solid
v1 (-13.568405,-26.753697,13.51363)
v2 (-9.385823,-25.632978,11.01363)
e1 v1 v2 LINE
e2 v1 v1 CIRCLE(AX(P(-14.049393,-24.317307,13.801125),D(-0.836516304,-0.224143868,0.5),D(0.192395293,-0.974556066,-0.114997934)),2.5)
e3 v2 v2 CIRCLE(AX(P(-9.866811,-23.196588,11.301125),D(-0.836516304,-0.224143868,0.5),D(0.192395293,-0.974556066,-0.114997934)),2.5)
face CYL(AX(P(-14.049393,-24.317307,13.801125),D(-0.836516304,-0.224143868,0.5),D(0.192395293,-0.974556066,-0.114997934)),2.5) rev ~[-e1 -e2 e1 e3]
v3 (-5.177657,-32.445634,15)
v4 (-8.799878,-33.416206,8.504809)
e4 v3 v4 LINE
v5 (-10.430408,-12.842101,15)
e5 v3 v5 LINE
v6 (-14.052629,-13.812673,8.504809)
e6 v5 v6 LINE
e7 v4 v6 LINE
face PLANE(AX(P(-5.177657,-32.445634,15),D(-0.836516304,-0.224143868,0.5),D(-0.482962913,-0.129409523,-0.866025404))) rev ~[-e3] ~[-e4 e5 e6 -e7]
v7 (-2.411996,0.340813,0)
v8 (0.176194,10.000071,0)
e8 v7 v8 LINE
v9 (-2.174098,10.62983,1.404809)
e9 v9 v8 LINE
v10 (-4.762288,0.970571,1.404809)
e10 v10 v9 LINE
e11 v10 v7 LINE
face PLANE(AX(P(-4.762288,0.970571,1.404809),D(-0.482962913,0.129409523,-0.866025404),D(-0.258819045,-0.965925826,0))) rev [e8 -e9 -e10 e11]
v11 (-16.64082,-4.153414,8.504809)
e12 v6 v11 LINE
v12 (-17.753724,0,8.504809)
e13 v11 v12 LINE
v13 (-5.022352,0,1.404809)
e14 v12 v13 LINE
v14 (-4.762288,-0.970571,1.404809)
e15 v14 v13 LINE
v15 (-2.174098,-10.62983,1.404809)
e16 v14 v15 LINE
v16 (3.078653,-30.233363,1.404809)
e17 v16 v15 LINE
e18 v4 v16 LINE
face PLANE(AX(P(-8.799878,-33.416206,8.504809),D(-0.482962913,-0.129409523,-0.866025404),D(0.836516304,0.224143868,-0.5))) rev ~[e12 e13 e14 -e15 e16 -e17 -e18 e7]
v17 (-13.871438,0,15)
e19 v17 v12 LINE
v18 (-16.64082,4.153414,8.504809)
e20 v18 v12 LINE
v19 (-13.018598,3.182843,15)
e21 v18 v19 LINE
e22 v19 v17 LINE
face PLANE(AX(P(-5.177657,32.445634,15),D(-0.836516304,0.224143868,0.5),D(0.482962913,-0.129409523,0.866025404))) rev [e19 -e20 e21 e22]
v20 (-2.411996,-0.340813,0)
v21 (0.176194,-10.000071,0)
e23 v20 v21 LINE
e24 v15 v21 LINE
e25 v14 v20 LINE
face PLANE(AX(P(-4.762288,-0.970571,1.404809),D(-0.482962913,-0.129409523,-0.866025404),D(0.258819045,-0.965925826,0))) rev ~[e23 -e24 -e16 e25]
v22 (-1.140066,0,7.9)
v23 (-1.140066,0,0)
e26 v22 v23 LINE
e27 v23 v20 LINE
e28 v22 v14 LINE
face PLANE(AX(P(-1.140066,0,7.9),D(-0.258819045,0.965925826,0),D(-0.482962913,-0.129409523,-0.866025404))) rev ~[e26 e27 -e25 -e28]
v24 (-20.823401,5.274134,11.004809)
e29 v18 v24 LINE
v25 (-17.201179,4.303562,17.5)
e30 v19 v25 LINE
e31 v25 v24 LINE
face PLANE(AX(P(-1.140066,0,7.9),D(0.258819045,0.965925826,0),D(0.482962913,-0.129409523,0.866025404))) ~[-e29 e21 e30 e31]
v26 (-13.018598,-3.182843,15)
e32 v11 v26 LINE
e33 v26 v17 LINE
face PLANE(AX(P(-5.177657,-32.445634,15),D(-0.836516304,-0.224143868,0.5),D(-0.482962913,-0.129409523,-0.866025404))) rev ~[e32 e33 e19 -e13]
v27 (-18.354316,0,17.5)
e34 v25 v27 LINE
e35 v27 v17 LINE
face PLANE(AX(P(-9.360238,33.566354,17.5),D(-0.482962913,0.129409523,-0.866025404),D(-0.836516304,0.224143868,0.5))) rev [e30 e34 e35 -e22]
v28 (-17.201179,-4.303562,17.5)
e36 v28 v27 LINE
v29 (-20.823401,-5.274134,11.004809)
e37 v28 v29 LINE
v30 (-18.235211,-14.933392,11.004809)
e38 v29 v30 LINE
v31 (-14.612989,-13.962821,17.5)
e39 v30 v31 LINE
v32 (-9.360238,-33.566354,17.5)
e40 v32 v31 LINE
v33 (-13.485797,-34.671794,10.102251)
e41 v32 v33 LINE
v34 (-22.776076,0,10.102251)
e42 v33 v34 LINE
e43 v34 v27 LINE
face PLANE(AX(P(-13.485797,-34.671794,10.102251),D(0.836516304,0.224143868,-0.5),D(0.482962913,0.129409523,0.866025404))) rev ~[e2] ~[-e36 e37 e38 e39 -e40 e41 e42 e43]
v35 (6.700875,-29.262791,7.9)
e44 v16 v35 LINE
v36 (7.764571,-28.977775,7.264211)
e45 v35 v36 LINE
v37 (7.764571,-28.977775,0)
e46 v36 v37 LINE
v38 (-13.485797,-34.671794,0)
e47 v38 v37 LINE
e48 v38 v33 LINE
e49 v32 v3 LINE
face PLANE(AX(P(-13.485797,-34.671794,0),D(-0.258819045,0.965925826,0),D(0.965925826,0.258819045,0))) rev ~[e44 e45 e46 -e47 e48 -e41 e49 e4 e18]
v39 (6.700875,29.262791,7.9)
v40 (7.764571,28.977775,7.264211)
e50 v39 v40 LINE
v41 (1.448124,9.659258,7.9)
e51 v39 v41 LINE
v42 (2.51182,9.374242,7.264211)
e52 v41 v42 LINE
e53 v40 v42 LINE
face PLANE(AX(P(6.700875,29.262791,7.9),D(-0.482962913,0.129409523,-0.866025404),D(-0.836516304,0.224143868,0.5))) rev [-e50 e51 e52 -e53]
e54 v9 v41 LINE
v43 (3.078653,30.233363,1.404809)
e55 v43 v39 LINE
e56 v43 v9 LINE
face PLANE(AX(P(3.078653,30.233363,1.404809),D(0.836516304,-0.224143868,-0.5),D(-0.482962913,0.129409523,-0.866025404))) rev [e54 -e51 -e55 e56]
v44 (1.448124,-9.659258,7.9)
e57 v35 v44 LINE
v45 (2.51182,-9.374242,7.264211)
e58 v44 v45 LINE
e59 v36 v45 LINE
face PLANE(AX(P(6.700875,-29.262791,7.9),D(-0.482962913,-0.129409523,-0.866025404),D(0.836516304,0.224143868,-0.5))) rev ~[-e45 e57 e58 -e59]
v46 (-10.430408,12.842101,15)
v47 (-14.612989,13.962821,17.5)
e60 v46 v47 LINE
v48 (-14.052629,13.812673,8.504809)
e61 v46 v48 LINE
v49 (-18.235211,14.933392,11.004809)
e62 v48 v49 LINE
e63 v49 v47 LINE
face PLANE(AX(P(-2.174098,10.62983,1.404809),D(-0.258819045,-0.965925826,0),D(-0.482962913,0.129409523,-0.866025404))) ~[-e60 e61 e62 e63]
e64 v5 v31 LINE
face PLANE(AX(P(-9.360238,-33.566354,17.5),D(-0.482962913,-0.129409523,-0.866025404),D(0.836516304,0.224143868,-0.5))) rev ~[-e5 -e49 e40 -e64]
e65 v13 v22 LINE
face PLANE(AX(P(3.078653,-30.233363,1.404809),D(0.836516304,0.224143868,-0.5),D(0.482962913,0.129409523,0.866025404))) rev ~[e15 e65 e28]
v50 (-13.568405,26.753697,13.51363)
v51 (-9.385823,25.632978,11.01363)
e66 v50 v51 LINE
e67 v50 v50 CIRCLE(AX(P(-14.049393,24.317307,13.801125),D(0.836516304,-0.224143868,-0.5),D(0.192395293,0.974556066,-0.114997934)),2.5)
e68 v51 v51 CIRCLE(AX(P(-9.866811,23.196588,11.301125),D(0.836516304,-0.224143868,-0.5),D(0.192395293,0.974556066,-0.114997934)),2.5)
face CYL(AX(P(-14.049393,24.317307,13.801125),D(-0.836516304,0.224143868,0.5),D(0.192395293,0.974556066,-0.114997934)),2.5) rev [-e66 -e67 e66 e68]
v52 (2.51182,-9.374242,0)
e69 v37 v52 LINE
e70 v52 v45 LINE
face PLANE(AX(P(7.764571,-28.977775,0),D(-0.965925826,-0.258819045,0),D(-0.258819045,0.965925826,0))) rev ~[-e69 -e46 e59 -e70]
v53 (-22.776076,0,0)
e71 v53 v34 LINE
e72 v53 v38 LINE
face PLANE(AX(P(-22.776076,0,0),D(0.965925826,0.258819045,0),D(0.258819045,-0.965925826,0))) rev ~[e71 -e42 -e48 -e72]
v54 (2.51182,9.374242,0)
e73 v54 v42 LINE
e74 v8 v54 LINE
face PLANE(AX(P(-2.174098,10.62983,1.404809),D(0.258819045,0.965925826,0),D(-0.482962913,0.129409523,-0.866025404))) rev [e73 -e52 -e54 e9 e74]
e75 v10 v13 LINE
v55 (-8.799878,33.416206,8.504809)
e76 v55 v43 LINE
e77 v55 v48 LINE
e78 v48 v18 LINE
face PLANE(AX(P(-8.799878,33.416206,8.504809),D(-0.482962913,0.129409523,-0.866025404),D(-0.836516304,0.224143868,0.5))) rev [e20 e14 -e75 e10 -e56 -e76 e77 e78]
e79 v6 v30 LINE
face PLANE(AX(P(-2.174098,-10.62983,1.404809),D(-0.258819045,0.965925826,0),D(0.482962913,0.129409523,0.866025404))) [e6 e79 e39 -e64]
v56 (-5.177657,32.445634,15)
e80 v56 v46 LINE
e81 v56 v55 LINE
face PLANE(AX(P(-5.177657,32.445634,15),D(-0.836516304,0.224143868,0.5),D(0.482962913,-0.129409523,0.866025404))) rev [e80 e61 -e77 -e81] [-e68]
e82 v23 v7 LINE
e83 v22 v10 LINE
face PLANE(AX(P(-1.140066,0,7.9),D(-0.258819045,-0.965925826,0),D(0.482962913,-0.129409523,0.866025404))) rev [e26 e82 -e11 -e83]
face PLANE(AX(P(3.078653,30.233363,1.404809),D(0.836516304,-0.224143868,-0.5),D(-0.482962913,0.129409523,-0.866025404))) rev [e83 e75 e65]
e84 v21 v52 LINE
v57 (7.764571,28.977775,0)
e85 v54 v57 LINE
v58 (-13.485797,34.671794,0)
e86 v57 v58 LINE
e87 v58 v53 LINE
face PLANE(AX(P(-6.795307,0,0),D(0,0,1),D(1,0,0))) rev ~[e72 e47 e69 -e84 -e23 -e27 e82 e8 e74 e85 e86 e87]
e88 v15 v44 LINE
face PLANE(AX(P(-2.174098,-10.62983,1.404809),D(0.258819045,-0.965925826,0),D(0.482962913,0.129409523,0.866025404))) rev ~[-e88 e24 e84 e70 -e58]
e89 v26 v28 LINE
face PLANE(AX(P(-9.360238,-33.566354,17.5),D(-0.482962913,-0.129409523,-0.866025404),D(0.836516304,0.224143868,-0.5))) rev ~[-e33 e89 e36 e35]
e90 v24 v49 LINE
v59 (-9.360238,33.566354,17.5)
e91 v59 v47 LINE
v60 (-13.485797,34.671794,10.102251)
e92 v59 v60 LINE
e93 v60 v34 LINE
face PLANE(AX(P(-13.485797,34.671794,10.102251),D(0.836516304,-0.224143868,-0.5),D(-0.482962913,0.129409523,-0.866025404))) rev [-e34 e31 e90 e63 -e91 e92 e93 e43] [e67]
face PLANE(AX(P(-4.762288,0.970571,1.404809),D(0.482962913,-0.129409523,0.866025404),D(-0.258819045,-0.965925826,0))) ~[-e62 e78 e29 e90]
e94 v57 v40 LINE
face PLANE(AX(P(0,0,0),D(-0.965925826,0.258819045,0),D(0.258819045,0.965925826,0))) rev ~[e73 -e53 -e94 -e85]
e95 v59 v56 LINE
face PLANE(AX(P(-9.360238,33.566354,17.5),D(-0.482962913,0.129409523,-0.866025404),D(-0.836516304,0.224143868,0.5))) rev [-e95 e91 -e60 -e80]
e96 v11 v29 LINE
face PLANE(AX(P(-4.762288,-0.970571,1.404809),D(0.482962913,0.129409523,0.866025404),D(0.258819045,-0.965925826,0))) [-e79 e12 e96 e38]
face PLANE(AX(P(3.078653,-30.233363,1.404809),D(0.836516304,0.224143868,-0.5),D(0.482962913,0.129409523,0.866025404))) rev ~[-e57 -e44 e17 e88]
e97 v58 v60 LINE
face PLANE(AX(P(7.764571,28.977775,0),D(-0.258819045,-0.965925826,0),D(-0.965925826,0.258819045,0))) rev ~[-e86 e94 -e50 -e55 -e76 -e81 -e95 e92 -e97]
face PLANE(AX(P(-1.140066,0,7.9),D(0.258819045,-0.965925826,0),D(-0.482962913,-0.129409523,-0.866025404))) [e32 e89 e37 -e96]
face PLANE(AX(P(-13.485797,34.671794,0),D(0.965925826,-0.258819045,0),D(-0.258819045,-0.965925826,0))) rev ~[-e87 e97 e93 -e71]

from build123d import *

# Parameters (mm, degrees)
F1_DEPTH       = 20
F4_REACH       = 59.8904911491
F6_REACH       = 49.0077165035
F8_DEPTH       = 17.7213446758
F8_DEPTH_BACK  = 25
F10_REACH      = 31.5666498146
F12_DEPTH      = 19.1713446758
F12_DEPTH_BACK = 31.9213446758
F13_R          = 2.5
F14_DEPTH      = 5


with BuildPart() as f1:
    # F0 (on Top) → F1 (new body)
    with BuildSketch(Plane.XY):
        Polygon((7.7645713531, -28.9777747887), (0, 0), (7.7645713531, 28.9777747887), (-13.4857968253, 34.6717937809), (-22.776075969, 0), (-13.4857968253, -34.6717937809), align=None)
    extrude(amount=F1_DEPTH)

    f4_end = Plane(origin=(0, 0, 20), x_dir=(0, 0, 1), z_dir=(0, 1, 0))
    # F3 (on face) → F4 (cut, up to a plane its end follows)
    with BuildSketch(Plane(origin=(7.7645713531, -28.9777747887, 0), x_dir=(0.9659258263, 0.2588190451, 0), z_dir=(0.2588190451, -0.9659258263, 0))):
        Polygon((-13.3987803669, 15), (-17.1487803669, 8.5048094716), (-4.8512196331, 1.4048094716), (-1.1012196331, 7.9), (0, 7.9), (0, 20), (-13.3987803669, 20), align=None)
    f4_long = extrude(amount=-F4_REACH, mode=Mode.PRIVATE)
    add(split(f4_long, bisect_by=f4_end, keep=Keep.BOTTOM, mode=Mode.PRIVATE), mode=Mode.SUBTRACT)

    f6_end = Plane(origin=(0, 0, 20), x_dir=(0, 0, 1), z_dir=(0, 1, 0))
    # F5 (on face) → F6 (cut, up to a plane its end follows)
    with BuildSketch(Plane(origin=(7.7645713531, -28.9777747887, 0), x_dir=(0.9659258263, 0.2588190451, 0), z_dir=(0.2588190451, -0.9659258263, 0))):
        Polygon((-22, 20), (-22, 10.1022505884), (-17.7289073858, 17.5), (-13.3987803669, 15), (-13.3987803669, 20), align=None)
    f6_long = extrude(amount=-F6_REACH, mode=Mode.PRIVATE)
    add(split(f6_long, bisect_by=f6_end, keep=Keep.BOTTOM, mode=Mode.PRIVATE), mode=Mode.SUBTRACT)

    # F7 (on face) → F8 (cut, two sides)
    with BuildSketch(Plane(origin=(-15.9805432759, -4.2819736654, 9.5518420887), x_dir=(-0.1923952931, 0.9745560663, 0.1149979338), z_dir=(0.8365163037, 0.224143868, -0.5))) as f8_sk:
        Polygon((-28.8989639862, 10.218925907), (-36.8281195036, 11.2812313158), (-37.8240308243, 3.8476480182), (-29.8948753069, 2.7853426095), align=None)
    extrude(amount=-F8_DEPTH, mode=Mode.SUBTRACT)
    extrude(f8_sk.sketch, amount=F8_DEPTH_BACK, mode=Mode.SUBTRACT)

    f10_end = Plane(origin=(0, 0, 20), x_dir=(0, 0, 1), z_dir=(0, 1, 0))
    # F9 (on face) → F10 (cut, up to a plane its end follows)
    with BuildSketch(Plane(origin=(7.7645713531, -28.9777747887, 0), x_dir=(0.9659258263, 0.2588190451, 0), z_dir=(0.2588190451, -0.9659258263, 0))):
        Polygon((0, 7.9), (-1.1012196331, 7.9), (0, 7.2642105484), align=None)
    f10_long = extrude(amount=-F10_REACH, mode=Mode.PRIVATE)
    add(split(f10_long, bisect_by=f10_end, keep=Keep.BOTTOM, mode=Mode.PRIVATE), mode=Mode.SUBTRACT)

    # F11 (on face) → F12 (cut, two sides)
    with BuildSketch(Plane(origin=(-4.1020117628, -1.0991307392, 2.4518420887), x_dir=(0.1923952931, -0.9745560663, -0.1149979338), z_dir=(-0.8365163037, -0.224143868, 0.5))) as f12_sk:
        Polygon((8.7836172997, 7.5239804569), (-1.127827097, 6.196098696), (-0.1319157763, -1.2374846015), (9.7795286204, 0.0903971594), align=None)
    extrude(amount=-F12_DEPTH, mode=Mode.SUBTRACT)
    extrude(f12_sk.sketch, amount=F12_DEPTH_BACK, mode=Mode.SUBTRACT)

    # F13 (on face) → F14 (cut, through all)
    with BuildSketch(Plane(origin=(-20.1631247946, -5.4026930056, 12.0518420887), x_dir=(0.1923952931, -0.9745560663, -0.1149979338), z_dir=(-0.8365163037, -0.224143868, 0.5))):
        with Locations((19.4084412411, 4.6381834861)):
            Circle(F13_R)
    extrude(amount=-F14_DEPTH, mode=Mode.SUBTRACT)

    # F15: F1 across plane


with BuildPart() as f1_1:
    add(f1.part)
    add(f1.part.mirror(Plane.XZ), mode=Mode.INTERSECT)


solid = f1_1.part
